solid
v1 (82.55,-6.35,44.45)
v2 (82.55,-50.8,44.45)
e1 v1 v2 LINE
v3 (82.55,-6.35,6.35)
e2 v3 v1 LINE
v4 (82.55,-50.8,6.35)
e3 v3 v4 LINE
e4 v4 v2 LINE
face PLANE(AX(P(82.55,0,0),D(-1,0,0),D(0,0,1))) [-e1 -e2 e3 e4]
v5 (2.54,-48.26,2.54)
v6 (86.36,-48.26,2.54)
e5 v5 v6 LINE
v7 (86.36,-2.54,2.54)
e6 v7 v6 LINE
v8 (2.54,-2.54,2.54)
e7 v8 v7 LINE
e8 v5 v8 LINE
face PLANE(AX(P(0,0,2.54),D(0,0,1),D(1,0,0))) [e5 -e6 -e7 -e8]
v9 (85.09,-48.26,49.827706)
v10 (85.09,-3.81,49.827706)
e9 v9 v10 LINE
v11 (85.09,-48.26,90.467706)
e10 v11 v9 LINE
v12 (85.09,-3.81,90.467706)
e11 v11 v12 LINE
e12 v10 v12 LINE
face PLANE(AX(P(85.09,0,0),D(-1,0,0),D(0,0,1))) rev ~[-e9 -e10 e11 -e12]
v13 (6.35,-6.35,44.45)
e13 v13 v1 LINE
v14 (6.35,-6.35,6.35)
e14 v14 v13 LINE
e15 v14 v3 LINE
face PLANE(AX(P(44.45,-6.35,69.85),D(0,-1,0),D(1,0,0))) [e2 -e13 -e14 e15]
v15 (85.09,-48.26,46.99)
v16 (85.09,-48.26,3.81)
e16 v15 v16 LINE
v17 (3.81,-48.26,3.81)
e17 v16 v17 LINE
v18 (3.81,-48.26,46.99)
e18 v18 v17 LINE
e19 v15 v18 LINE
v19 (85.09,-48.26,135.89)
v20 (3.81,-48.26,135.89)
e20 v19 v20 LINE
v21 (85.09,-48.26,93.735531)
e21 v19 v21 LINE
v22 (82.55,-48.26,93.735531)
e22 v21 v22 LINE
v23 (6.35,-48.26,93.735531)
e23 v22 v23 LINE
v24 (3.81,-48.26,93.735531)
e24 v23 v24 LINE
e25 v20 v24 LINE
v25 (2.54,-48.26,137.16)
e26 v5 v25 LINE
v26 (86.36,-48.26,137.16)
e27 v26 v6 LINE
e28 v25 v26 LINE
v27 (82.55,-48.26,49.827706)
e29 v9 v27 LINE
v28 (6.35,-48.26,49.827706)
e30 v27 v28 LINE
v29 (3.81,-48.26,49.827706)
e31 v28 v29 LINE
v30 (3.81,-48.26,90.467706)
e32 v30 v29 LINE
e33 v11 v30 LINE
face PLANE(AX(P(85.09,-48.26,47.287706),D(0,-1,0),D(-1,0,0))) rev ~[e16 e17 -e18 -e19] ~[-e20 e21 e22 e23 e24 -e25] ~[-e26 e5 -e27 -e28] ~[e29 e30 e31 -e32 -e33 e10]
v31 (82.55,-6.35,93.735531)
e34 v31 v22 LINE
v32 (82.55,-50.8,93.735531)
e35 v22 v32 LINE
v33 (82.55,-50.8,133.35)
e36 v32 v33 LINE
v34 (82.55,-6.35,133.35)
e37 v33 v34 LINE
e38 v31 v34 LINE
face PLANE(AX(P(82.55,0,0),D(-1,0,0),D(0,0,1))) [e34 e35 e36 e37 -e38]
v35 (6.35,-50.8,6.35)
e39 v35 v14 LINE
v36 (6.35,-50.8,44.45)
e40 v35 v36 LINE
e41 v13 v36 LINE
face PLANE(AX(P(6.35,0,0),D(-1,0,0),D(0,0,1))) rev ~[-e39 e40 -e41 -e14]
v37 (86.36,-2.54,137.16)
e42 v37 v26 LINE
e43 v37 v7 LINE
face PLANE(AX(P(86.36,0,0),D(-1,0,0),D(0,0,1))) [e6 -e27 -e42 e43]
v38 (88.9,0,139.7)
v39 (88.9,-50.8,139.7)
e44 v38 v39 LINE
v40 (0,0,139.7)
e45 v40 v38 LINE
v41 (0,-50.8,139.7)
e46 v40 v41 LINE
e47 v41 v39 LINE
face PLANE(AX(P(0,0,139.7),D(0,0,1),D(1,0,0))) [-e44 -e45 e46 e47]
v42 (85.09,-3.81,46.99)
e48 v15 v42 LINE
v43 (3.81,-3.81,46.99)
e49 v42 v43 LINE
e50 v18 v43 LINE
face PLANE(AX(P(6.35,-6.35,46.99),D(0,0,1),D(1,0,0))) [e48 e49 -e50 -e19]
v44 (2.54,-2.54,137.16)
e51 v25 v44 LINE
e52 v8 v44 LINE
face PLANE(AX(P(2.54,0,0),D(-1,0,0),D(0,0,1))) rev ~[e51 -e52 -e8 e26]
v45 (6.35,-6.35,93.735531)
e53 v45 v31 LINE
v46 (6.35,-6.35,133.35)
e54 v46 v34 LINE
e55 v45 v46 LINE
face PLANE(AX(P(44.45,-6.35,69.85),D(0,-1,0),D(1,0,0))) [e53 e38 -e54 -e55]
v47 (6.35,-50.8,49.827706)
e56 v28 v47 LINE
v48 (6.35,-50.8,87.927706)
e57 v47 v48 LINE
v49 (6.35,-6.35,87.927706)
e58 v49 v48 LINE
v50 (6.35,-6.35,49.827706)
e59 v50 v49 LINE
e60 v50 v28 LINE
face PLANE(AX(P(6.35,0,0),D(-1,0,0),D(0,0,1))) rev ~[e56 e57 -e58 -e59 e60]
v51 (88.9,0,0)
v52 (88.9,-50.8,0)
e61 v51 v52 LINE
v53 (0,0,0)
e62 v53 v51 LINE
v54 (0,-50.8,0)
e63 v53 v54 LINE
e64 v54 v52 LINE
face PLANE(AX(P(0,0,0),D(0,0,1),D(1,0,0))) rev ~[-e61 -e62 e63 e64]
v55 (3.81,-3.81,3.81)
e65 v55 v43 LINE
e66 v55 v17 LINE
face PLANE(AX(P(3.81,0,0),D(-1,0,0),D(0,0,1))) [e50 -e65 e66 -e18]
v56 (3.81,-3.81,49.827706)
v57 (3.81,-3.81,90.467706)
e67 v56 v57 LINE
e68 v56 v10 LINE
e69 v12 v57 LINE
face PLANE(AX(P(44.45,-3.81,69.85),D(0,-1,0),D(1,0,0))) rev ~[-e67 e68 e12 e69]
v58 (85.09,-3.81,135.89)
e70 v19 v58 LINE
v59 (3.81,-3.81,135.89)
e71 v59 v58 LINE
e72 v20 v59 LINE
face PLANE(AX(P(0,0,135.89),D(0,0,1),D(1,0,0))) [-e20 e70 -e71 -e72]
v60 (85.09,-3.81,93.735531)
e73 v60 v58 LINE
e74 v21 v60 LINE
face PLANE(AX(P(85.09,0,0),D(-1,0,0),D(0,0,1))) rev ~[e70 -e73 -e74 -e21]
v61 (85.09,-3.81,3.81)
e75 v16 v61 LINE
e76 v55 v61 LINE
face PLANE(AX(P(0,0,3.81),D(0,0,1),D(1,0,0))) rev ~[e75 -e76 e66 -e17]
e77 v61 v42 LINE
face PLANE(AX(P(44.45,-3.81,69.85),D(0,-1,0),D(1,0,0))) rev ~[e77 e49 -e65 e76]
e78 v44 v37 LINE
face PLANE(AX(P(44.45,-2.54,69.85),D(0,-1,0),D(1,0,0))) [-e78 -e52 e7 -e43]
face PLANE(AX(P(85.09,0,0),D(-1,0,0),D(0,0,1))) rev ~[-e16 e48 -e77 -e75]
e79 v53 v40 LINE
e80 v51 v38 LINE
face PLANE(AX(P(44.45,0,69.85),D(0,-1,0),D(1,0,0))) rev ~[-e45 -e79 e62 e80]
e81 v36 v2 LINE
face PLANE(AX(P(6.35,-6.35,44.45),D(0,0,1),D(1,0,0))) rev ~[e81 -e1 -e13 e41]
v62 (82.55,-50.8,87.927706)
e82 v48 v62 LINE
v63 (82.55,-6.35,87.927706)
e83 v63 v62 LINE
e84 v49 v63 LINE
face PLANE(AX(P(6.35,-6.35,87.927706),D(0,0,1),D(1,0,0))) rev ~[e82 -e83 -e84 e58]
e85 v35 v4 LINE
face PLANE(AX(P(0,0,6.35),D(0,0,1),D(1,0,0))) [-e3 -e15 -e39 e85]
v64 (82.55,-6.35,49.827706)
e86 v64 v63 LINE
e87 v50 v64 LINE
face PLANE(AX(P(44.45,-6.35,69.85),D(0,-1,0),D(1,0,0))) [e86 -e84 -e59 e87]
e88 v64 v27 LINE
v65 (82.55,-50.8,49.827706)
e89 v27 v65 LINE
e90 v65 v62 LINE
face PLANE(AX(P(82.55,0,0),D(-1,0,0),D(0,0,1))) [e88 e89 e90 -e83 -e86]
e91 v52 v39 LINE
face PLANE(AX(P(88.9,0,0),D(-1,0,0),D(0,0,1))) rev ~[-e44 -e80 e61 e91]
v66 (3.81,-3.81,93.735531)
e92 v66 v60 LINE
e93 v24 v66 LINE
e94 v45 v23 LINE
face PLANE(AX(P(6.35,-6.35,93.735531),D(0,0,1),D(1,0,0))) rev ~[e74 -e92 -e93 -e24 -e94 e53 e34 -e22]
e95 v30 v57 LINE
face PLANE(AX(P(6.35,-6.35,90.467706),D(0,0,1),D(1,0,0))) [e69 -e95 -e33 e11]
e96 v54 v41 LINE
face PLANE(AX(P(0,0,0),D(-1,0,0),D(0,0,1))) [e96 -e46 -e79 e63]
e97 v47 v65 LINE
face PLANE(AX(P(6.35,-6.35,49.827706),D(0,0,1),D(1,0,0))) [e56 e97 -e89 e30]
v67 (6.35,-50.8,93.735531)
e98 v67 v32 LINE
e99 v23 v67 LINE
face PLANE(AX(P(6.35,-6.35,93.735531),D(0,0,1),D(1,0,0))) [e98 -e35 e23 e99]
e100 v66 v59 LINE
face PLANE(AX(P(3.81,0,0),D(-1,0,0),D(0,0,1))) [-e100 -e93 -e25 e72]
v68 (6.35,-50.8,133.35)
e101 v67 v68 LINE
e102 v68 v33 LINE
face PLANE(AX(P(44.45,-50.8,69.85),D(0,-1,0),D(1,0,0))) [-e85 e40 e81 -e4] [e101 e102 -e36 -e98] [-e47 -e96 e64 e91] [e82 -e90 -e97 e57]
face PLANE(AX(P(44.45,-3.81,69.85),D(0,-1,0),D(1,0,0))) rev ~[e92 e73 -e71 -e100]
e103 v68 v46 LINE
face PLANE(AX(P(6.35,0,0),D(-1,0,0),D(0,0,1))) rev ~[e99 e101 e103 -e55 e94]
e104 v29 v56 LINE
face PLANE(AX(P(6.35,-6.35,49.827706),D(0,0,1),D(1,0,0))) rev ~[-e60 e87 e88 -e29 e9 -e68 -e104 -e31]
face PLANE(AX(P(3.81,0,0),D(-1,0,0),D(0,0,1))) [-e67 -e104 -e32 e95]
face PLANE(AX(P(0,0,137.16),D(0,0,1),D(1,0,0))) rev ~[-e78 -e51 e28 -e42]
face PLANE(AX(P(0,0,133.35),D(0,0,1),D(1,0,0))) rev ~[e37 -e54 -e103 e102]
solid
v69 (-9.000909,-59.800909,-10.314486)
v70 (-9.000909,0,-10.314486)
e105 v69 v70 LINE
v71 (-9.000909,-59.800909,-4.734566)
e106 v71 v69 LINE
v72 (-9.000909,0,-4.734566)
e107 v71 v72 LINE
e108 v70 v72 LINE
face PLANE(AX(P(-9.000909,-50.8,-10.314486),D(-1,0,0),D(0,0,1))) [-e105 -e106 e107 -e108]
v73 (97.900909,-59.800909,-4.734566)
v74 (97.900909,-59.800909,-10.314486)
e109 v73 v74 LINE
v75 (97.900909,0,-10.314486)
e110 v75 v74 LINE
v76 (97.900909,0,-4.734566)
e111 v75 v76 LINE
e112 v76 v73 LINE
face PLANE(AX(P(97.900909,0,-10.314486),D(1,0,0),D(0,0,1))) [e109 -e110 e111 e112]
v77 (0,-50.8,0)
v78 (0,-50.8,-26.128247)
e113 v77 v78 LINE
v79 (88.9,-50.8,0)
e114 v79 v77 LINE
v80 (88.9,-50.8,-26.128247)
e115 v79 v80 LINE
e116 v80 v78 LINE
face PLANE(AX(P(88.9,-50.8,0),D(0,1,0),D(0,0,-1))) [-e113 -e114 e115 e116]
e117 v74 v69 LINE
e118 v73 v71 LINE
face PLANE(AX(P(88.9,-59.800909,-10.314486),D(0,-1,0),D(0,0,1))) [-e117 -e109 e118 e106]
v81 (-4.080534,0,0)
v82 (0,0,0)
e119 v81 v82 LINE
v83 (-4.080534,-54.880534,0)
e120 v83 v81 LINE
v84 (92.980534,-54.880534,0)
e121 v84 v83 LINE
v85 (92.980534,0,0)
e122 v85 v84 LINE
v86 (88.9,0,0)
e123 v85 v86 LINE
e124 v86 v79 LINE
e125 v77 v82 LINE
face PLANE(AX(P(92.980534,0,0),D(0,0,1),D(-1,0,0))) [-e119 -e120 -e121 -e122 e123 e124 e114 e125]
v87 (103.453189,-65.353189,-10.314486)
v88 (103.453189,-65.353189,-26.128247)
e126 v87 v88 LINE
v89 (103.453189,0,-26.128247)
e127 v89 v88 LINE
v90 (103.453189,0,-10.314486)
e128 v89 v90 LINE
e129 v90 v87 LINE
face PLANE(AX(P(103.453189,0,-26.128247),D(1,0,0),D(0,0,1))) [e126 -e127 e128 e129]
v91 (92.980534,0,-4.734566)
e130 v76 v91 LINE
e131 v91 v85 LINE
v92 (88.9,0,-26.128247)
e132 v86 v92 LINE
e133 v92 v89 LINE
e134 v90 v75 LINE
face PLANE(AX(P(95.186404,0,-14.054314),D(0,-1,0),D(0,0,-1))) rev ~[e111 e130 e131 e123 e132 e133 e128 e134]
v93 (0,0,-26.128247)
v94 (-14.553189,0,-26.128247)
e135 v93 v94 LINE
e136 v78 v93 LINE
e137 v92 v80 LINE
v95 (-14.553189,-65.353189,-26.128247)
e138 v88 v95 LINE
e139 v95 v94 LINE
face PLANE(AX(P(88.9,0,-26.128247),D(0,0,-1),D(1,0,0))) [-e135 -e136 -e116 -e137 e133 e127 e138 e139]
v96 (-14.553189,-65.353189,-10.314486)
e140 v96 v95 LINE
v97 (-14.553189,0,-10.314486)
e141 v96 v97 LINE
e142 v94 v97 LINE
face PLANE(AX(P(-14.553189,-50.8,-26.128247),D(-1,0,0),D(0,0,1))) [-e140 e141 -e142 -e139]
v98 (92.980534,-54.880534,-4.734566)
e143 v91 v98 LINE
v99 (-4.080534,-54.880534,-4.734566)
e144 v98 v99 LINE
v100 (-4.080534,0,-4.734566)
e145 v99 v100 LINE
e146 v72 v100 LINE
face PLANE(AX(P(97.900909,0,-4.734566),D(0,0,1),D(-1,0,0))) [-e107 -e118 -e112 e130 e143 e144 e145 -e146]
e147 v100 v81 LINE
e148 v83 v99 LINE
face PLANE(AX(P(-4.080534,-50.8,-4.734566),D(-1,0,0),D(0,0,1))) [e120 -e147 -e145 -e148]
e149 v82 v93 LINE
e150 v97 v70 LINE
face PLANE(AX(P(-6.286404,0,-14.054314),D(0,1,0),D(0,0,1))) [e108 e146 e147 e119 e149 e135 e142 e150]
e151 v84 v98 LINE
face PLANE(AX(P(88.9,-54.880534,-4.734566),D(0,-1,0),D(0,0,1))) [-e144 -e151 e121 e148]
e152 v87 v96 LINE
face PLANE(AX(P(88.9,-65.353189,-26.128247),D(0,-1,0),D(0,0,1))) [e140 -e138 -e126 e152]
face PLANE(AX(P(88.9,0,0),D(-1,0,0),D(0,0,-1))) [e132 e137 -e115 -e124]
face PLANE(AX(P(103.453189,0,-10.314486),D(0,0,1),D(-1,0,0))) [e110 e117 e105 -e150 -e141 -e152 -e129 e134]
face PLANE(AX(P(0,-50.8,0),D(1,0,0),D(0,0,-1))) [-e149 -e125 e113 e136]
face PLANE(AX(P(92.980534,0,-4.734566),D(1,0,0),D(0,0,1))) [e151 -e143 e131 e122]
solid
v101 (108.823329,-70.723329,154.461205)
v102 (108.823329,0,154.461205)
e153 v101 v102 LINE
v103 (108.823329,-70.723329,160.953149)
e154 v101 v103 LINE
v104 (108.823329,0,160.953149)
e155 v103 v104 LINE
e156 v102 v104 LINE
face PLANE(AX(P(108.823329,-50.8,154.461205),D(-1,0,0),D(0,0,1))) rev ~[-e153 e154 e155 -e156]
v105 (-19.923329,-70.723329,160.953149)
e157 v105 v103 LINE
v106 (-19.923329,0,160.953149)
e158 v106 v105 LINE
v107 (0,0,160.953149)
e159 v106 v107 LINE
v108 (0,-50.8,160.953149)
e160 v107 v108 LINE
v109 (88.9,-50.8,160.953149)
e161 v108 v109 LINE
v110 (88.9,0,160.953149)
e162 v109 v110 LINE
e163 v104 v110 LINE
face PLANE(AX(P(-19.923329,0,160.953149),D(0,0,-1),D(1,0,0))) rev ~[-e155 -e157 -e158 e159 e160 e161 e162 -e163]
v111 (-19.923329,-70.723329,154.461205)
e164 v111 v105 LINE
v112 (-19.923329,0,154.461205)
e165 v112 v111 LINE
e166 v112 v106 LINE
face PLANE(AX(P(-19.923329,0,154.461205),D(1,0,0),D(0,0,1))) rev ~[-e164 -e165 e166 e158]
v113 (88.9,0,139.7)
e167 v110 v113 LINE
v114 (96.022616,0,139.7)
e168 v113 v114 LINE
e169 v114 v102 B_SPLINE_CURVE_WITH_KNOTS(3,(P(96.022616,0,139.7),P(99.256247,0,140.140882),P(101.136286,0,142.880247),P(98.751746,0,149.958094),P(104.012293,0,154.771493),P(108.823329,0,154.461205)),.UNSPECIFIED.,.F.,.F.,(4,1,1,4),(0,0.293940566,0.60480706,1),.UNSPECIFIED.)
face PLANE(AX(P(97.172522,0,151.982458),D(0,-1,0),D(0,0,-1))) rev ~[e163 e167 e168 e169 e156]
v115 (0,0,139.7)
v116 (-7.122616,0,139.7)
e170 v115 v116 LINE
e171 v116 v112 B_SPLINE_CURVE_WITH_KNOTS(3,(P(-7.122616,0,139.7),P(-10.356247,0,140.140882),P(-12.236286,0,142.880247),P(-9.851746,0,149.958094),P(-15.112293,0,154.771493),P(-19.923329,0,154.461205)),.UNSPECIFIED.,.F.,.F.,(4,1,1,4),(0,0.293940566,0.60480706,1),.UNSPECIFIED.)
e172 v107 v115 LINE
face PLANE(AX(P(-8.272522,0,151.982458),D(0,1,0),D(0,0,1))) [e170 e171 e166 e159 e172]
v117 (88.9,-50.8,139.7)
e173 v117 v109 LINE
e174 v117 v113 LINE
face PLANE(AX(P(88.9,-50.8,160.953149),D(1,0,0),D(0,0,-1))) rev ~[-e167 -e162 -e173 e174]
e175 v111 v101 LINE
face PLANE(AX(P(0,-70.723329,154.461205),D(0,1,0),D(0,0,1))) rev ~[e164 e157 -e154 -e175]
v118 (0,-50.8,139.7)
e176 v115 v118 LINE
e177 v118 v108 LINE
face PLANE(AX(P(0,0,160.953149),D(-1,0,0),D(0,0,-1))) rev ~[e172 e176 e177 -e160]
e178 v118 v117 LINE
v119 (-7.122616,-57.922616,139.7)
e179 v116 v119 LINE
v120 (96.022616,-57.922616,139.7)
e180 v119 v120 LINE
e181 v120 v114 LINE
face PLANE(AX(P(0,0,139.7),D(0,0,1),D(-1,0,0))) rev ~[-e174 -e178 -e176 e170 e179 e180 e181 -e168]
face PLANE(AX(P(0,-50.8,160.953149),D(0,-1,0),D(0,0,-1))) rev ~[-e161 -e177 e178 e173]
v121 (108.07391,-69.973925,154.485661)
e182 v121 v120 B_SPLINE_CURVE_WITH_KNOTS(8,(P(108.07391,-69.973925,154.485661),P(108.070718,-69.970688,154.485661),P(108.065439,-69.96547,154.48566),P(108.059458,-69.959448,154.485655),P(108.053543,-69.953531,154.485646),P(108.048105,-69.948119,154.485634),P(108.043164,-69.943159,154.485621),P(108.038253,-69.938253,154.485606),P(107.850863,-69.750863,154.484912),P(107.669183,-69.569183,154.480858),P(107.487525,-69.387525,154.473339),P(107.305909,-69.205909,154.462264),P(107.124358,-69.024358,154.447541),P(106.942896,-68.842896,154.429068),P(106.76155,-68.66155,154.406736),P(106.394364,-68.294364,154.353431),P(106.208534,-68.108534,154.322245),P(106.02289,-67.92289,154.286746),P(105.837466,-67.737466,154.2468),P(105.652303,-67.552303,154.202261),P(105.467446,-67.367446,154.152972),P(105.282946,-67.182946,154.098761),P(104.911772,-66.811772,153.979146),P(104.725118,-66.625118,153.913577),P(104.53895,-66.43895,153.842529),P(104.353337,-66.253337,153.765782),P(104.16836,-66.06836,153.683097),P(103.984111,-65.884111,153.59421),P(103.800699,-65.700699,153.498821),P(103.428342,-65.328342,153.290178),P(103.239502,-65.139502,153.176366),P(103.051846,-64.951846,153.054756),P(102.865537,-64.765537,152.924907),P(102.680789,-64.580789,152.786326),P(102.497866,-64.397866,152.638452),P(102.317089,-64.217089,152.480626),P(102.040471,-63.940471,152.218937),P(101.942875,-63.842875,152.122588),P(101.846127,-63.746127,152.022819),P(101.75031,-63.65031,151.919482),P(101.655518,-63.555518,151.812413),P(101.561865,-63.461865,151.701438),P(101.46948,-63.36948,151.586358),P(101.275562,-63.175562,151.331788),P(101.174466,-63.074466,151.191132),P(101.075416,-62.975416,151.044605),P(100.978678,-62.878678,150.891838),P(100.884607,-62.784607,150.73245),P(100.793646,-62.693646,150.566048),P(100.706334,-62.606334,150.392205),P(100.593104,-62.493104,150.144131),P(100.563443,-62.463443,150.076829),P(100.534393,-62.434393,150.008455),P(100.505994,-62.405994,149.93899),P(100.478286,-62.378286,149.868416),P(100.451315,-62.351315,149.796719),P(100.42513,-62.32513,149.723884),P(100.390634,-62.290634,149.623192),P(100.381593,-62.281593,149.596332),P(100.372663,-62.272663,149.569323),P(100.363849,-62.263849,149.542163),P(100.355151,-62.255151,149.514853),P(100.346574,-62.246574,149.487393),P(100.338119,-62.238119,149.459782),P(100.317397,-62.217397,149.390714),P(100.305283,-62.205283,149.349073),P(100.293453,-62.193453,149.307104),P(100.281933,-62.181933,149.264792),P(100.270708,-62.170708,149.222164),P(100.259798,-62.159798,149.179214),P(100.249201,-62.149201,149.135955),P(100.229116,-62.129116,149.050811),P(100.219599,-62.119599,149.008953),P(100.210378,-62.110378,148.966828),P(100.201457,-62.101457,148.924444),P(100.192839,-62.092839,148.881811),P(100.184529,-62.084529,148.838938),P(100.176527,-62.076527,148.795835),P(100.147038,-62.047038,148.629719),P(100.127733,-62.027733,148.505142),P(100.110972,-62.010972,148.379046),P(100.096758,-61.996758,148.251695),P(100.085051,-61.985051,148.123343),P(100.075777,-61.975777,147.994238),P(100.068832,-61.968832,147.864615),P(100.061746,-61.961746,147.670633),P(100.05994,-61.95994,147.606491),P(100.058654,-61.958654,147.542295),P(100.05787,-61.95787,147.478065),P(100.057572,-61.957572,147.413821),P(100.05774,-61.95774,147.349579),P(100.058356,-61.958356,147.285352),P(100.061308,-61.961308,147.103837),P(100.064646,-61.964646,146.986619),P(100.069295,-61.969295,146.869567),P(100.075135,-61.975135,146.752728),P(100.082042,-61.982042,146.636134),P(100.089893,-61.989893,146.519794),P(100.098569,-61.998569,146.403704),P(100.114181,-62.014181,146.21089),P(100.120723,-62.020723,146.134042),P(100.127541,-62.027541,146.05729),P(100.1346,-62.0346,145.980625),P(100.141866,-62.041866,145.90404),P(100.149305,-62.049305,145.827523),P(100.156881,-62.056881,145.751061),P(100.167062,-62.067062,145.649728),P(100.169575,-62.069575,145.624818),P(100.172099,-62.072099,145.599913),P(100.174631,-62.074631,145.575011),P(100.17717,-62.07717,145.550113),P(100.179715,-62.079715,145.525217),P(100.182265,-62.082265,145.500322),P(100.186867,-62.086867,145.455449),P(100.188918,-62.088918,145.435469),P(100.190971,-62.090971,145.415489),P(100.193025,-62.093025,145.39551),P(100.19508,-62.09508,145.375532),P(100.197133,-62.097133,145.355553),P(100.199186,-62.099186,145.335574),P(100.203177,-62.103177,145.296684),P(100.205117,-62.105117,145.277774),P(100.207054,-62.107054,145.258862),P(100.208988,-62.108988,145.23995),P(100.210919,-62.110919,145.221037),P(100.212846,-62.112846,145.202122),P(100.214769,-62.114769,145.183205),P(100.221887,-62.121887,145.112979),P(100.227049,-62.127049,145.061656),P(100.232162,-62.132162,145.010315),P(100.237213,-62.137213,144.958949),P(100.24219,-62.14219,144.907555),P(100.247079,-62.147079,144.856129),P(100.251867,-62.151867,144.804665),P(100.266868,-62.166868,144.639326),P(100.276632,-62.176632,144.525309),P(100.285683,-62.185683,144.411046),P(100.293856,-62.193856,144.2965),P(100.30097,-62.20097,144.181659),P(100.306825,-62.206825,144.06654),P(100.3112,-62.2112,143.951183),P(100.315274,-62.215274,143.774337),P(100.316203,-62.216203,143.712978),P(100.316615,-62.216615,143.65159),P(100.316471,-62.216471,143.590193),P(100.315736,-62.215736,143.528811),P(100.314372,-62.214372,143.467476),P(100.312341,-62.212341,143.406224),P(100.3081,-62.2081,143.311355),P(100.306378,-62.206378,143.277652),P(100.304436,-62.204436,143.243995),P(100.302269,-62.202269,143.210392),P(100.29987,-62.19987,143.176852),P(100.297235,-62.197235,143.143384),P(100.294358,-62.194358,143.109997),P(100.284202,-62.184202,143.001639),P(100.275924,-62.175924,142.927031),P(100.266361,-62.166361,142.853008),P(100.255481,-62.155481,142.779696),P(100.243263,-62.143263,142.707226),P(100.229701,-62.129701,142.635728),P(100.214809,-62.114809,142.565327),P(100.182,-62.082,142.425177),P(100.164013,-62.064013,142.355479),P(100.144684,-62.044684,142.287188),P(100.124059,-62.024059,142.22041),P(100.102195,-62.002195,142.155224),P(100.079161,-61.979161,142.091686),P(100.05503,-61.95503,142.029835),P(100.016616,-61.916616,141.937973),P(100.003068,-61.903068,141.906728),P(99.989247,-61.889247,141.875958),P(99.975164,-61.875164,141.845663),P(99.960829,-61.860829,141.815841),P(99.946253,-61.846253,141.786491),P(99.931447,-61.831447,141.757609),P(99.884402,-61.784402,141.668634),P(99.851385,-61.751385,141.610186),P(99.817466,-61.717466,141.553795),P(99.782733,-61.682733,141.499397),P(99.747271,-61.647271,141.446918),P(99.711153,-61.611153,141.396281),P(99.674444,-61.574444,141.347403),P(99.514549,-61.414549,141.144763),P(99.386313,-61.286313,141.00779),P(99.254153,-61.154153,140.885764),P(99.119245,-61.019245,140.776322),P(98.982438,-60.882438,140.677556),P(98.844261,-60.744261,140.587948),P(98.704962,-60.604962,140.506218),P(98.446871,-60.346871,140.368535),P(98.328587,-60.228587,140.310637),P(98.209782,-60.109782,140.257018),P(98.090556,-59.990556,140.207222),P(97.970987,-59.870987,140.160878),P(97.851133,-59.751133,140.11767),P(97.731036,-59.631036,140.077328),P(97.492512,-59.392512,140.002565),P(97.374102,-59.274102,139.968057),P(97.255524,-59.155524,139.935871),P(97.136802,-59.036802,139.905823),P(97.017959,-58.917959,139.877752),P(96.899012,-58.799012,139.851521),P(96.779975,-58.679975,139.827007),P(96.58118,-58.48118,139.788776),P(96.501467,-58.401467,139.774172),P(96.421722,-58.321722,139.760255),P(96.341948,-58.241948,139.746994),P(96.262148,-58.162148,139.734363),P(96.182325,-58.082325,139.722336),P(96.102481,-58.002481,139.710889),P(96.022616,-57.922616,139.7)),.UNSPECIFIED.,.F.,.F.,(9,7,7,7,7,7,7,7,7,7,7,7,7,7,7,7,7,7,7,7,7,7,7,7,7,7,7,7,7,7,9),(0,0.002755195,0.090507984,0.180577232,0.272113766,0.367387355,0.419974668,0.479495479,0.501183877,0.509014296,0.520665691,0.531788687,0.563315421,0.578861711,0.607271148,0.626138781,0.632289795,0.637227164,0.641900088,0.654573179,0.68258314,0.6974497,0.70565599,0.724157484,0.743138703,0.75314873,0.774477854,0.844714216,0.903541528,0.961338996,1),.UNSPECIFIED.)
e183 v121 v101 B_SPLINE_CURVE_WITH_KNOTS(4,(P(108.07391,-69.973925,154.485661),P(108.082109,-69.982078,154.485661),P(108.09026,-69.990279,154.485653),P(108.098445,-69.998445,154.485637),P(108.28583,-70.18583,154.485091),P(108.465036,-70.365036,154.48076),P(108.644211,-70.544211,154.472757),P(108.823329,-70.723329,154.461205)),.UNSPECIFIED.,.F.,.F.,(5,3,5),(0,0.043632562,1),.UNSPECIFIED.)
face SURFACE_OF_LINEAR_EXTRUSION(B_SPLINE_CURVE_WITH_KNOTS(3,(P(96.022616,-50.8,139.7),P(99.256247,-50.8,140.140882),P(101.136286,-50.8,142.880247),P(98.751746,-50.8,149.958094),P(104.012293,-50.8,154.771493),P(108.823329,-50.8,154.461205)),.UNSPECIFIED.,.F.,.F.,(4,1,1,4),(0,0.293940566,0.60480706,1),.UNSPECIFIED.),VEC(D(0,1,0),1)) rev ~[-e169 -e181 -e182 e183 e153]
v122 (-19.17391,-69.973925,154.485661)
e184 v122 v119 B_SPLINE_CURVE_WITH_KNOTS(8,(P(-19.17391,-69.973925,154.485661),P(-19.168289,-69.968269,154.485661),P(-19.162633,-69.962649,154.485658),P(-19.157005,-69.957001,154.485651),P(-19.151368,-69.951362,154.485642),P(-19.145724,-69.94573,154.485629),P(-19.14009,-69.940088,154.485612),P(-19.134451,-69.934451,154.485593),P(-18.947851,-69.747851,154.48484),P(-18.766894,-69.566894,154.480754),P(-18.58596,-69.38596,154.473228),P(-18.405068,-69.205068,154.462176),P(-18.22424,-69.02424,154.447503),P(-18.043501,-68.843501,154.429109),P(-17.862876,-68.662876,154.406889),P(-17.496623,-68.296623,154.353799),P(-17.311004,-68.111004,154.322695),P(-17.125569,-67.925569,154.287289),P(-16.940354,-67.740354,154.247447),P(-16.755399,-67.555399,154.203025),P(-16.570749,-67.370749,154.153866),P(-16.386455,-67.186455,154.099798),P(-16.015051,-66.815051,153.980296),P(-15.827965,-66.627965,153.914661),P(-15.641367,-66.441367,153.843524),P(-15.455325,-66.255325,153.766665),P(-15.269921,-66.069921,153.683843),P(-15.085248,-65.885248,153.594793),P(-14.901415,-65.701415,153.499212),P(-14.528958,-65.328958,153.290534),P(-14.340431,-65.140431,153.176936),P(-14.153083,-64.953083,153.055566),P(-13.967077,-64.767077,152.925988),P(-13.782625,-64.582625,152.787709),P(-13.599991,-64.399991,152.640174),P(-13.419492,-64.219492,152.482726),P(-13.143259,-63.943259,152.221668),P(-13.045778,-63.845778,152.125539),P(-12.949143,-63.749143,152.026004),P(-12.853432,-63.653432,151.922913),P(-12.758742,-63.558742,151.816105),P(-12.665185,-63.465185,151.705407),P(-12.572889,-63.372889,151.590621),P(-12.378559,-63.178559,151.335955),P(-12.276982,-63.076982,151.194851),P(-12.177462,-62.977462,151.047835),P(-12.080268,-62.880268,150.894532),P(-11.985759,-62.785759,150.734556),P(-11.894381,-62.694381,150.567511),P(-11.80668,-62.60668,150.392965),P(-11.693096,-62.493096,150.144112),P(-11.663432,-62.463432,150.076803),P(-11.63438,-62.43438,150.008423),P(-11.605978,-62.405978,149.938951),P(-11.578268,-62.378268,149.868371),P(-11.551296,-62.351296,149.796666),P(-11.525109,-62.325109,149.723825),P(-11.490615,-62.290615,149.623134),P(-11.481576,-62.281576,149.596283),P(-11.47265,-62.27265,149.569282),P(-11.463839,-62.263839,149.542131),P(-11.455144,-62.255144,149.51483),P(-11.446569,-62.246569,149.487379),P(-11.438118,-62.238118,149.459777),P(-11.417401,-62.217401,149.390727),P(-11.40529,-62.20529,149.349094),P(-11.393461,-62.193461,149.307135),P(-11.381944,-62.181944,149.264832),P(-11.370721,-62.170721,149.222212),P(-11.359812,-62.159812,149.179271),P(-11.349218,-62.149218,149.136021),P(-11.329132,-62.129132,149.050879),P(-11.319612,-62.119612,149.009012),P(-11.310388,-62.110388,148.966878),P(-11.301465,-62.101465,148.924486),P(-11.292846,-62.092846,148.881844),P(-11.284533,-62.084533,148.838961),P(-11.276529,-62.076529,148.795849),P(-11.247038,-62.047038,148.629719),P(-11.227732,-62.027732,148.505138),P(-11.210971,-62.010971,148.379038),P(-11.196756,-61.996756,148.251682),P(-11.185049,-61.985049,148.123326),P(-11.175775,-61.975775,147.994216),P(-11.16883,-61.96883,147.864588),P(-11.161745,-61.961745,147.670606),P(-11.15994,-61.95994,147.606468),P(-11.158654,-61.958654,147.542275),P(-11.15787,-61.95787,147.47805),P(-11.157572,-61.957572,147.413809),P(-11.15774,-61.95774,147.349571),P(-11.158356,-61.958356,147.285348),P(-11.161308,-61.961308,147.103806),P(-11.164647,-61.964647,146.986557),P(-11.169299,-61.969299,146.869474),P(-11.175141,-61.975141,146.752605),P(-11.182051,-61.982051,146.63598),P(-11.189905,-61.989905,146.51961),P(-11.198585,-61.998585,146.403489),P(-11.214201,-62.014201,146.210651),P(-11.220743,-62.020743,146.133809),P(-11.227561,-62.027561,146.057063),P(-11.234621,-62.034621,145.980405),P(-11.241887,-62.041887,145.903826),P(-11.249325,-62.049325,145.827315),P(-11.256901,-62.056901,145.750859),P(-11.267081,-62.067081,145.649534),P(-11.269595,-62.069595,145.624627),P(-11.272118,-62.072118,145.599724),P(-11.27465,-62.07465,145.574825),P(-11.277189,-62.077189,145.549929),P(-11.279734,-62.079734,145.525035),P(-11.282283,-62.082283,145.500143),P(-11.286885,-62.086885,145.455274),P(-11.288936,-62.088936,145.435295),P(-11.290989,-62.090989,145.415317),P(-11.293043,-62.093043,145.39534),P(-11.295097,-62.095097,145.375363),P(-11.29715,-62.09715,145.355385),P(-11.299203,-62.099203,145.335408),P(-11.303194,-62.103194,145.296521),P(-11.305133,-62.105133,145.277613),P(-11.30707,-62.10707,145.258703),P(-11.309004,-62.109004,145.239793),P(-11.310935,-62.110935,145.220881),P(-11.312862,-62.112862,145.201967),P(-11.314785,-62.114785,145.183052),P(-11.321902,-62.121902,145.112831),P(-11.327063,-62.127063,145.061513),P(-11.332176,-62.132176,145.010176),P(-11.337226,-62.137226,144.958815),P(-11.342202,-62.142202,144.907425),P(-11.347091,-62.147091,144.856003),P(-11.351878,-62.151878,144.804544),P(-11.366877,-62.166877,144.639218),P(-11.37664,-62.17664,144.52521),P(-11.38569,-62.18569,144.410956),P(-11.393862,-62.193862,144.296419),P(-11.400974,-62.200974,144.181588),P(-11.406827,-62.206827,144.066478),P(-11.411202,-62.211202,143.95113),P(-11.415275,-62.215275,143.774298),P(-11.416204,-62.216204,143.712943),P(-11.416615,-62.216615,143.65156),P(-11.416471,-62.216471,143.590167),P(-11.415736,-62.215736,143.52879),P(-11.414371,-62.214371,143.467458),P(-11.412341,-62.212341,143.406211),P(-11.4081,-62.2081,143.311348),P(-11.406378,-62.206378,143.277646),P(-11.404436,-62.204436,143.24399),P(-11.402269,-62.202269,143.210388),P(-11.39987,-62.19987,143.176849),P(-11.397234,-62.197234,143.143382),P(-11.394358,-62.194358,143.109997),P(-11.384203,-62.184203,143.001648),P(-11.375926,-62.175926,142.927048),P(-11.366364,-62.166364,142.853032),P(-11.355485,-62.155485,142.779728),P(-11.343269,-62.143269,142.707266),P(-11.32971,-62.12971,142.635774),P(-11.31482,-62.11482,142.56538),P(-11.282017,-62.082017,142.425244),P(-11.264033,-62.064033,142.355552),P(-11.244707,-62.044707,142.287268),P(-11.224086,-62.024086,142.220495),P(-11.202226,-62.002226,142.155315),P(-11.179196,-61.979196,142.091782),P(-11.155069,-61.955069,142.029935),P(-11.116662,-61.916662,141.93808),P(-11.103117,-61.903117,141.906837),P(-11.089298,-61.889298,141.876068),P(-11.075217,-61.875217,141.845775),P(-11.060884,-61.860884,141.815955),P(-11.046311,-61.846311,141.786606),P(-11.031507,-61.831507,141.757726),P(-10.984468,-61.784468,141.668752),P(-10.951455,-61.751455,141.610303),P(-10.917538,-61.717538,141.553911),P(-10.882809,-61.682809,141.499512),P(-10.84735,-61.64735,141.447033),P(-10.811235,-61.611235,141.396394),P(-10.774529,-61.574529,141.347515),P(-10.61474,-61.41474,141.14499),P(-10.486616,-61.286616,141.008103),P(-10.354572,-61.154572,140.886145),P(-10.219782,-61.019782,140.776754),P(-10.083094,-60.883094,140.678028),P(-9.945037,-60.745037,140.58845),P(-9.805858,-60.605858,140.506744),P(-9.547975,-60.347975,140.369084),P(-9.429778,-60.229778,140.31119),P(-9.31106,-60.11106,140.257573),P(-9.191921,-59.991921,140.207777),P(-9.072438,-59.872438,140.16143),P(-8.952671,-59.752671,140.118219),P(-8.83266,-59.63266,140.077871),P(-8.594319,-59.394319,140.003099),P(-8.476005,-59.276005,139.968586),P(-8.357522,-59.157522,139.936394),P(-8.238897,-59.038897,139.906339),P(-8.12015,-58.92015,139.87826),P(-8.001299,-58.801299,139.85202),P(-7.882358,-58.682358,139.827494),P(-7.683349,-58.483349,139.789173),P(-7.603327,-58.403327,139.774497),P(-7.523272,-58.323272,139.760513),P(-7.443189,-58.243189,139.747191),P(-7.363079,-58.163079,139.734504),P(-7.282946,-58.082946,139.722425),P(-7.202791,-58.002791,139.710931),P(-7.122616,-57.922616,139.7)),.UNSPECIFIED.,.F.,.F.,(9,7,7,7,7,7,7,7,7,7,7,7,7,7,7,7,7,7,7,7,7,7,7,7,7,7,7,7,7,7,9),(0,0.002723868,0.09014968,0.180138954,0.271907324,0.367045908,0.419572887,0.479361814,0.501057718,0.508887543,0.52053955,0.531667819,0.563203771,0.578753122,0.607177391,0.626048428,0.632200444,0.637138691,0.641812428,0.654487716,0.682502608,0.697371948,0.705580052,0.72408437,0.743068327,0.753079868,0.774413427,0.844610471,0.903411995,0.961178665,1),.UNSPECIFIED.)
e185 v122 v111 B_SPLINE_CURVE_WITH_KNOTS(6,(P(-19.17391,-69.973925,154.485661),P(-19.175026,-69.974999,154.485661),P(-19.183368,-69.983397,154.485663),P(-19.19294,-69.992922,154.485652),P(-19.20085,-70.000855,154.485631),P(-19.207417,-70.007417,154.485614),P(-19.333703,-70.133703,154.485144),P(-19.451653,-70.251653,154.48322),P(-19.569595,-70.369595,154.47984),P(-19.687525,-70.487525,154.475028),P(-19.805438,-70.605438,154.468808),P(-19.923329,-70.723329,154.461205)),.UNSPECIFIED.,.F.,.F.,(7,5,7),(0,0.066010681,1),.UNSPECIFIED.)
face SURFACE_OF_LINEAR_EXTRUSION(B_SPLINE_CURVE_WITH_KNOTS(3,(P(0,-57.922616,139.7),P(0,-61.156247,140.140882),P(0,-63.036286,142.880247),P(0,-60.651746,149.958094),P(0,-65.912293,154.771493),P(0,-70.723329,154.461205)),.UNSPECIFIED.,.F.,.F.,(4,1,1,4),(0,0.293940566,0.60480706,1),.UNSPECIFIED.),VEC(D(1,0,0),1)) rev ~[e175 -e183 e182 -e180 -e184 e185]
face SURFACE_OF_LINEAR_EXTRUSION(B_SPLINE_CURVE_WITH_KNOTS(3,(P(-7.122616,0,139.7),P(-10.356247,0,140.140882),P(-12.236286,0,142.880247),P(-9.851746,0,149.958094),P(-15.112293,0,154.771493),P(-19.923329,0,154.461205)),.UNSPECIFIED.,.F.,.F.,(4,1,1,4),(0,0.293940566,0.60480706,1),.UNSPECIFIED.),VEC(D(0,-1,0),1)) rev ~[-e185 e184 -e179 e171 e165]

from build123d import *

# Parameters (mm, degrees)
F0_W      = 88.9
F0_H      = 139.7
F1_DEPTH  = 50.8
F2_T      = -6.35
F9_W      = 76.2
F9_H      = 5.8078249037
F9_H_2    = 5.3777060688
F10_DEPTH = 44.45
F11_T     = -2.54


# Not quite as in the source:
# - a shell that OpenCascade refuses in one call is made with other operations: the cavity is built on its own and cut out


with BuildPart() as f1:
    # F0 (on Front) → F1 (new body)
    with BuildSketch(Plane.XZ):
        with Locations((44.45, 69.85)):
            Rectangle(F0_W, F0_H)
    extrude(amount=F1_DEPTH)

    # F2
    f2_openings = [f1.faces().sort_by_distance(p)[0] for p in [
        (44.45, -50.8, 69.85),
    ]]
    offset(amount=F2_T, openings=f2_openings)

    # F9 (on face) → F10 (join)
    with BuildSketch(Plane.XZ.offset(6.35)):
        with Locations((44.45, 90.8316185206)):
            Rectangle(F9_W, F9_H)
        with Locations((44.45, 47.1388530344)):
            Rectangle(F9_W, F9_H_2)
    extrude(amount=F10_DEPTH)

    # F11: a shell. OpenCascade refuses it in one call, so the cavity is built on its own and cut out:
    # the body offset inwards by the wall thickness, plus a prism from it out through each open face.
    f11_core = offset(f1.part, amount=F11_T, kind=Kind.INTERSECTION, mode=Mode.PRIVATE)
    f11_exits = [f11_core.faces().sort_by_distance(p)[0] for p in [
        (44.45, -26.035, 91.195531),
        (44.45, -26.035, 47.287706),
    ]]
    add(f11_core, mode=Mode.SUBTRACT)
    extrude(f11_exits, amount=-F11_T, mode=Mode.SUBTRACT)


with BuildPart() as f5:
    # F5: sweep along a path in F3
    with BuildLine(Plane.XY.offset(139.7)) as f5_path:
        Line((0, 0), (0, -50.8))
        Line((0, -50.8), (88.9, -50.8))
        Line((88.9, -50.8), (88.9, 0))
    # F4 (on face) → F5 (sweep)
    with BuildSketch(Plane(origin=(0, 0, 0), x_dir=(-1, 0, 0), z_dir=(0, 1, 0))):
        with BuildLine():
            Line((0, 160.9531491995), (0, 139.7))
            Line((0, 139.7), (7.1226162836, 139.7))
            add(Edge.make_bspline(
                [(19.9233293533, 154.4612050056), (15.1122931258, 154.7714925538), (9.8517459293, 149.9580939303), (12.2362864635, 142.8802470964), (10.3562465476, 140.1408824591), (7.1226162836, 139.7)],
                knots=[0, 0, 0, 0, 0.3951929402, 0.7060594336, 1, 1, 1, 1], degree=3))
            Line((19.9233293533, 154.4612050056), (19.9233293533, 160.9531491995))
            Line((19.9233293533, 160.9531491995), (0, 160.9531491995))
        make_face()
    sweep(path=f5_path.line, transition=Transition.RIGHT)


with BuildPart() as f8:
    # F8: sweep along a path in F6
    with BuildLine(Plane(origin=(0, 0, 0), x_dir=(1, 0, 0), z_dir=(0, 0, -1))) as f8_path:
        Line((88.9, 0), (88.9, 50.8))
        Line((88.9, 50.8), (0, 50.8))
        Line((0, 50.8), (0, 0))
    # F7 (on face) → F8 (sweep)
    with BuildSketch(Plane(origin=(0, 0, 0), x_dir=(-1, 0, 0), z_dir=(0, 1, 0))):
        Polygon((4.080534447, 0), (0, 0), (0, -26.1282473803), (14.5531892776, -26.1282473803), (14.5531892776, -14.4312130287), (14.5531892776, -10.3144859895), (9.0009085834, -10.3144859895), (9.0009085834, -4.7345655039), (4.080534447, -4.7345655039), align=None)
    sweep(path=f8_path.line, transition=Transition.RIGHT)


solid = Compound([f1.part, f5.part, f8.part])
